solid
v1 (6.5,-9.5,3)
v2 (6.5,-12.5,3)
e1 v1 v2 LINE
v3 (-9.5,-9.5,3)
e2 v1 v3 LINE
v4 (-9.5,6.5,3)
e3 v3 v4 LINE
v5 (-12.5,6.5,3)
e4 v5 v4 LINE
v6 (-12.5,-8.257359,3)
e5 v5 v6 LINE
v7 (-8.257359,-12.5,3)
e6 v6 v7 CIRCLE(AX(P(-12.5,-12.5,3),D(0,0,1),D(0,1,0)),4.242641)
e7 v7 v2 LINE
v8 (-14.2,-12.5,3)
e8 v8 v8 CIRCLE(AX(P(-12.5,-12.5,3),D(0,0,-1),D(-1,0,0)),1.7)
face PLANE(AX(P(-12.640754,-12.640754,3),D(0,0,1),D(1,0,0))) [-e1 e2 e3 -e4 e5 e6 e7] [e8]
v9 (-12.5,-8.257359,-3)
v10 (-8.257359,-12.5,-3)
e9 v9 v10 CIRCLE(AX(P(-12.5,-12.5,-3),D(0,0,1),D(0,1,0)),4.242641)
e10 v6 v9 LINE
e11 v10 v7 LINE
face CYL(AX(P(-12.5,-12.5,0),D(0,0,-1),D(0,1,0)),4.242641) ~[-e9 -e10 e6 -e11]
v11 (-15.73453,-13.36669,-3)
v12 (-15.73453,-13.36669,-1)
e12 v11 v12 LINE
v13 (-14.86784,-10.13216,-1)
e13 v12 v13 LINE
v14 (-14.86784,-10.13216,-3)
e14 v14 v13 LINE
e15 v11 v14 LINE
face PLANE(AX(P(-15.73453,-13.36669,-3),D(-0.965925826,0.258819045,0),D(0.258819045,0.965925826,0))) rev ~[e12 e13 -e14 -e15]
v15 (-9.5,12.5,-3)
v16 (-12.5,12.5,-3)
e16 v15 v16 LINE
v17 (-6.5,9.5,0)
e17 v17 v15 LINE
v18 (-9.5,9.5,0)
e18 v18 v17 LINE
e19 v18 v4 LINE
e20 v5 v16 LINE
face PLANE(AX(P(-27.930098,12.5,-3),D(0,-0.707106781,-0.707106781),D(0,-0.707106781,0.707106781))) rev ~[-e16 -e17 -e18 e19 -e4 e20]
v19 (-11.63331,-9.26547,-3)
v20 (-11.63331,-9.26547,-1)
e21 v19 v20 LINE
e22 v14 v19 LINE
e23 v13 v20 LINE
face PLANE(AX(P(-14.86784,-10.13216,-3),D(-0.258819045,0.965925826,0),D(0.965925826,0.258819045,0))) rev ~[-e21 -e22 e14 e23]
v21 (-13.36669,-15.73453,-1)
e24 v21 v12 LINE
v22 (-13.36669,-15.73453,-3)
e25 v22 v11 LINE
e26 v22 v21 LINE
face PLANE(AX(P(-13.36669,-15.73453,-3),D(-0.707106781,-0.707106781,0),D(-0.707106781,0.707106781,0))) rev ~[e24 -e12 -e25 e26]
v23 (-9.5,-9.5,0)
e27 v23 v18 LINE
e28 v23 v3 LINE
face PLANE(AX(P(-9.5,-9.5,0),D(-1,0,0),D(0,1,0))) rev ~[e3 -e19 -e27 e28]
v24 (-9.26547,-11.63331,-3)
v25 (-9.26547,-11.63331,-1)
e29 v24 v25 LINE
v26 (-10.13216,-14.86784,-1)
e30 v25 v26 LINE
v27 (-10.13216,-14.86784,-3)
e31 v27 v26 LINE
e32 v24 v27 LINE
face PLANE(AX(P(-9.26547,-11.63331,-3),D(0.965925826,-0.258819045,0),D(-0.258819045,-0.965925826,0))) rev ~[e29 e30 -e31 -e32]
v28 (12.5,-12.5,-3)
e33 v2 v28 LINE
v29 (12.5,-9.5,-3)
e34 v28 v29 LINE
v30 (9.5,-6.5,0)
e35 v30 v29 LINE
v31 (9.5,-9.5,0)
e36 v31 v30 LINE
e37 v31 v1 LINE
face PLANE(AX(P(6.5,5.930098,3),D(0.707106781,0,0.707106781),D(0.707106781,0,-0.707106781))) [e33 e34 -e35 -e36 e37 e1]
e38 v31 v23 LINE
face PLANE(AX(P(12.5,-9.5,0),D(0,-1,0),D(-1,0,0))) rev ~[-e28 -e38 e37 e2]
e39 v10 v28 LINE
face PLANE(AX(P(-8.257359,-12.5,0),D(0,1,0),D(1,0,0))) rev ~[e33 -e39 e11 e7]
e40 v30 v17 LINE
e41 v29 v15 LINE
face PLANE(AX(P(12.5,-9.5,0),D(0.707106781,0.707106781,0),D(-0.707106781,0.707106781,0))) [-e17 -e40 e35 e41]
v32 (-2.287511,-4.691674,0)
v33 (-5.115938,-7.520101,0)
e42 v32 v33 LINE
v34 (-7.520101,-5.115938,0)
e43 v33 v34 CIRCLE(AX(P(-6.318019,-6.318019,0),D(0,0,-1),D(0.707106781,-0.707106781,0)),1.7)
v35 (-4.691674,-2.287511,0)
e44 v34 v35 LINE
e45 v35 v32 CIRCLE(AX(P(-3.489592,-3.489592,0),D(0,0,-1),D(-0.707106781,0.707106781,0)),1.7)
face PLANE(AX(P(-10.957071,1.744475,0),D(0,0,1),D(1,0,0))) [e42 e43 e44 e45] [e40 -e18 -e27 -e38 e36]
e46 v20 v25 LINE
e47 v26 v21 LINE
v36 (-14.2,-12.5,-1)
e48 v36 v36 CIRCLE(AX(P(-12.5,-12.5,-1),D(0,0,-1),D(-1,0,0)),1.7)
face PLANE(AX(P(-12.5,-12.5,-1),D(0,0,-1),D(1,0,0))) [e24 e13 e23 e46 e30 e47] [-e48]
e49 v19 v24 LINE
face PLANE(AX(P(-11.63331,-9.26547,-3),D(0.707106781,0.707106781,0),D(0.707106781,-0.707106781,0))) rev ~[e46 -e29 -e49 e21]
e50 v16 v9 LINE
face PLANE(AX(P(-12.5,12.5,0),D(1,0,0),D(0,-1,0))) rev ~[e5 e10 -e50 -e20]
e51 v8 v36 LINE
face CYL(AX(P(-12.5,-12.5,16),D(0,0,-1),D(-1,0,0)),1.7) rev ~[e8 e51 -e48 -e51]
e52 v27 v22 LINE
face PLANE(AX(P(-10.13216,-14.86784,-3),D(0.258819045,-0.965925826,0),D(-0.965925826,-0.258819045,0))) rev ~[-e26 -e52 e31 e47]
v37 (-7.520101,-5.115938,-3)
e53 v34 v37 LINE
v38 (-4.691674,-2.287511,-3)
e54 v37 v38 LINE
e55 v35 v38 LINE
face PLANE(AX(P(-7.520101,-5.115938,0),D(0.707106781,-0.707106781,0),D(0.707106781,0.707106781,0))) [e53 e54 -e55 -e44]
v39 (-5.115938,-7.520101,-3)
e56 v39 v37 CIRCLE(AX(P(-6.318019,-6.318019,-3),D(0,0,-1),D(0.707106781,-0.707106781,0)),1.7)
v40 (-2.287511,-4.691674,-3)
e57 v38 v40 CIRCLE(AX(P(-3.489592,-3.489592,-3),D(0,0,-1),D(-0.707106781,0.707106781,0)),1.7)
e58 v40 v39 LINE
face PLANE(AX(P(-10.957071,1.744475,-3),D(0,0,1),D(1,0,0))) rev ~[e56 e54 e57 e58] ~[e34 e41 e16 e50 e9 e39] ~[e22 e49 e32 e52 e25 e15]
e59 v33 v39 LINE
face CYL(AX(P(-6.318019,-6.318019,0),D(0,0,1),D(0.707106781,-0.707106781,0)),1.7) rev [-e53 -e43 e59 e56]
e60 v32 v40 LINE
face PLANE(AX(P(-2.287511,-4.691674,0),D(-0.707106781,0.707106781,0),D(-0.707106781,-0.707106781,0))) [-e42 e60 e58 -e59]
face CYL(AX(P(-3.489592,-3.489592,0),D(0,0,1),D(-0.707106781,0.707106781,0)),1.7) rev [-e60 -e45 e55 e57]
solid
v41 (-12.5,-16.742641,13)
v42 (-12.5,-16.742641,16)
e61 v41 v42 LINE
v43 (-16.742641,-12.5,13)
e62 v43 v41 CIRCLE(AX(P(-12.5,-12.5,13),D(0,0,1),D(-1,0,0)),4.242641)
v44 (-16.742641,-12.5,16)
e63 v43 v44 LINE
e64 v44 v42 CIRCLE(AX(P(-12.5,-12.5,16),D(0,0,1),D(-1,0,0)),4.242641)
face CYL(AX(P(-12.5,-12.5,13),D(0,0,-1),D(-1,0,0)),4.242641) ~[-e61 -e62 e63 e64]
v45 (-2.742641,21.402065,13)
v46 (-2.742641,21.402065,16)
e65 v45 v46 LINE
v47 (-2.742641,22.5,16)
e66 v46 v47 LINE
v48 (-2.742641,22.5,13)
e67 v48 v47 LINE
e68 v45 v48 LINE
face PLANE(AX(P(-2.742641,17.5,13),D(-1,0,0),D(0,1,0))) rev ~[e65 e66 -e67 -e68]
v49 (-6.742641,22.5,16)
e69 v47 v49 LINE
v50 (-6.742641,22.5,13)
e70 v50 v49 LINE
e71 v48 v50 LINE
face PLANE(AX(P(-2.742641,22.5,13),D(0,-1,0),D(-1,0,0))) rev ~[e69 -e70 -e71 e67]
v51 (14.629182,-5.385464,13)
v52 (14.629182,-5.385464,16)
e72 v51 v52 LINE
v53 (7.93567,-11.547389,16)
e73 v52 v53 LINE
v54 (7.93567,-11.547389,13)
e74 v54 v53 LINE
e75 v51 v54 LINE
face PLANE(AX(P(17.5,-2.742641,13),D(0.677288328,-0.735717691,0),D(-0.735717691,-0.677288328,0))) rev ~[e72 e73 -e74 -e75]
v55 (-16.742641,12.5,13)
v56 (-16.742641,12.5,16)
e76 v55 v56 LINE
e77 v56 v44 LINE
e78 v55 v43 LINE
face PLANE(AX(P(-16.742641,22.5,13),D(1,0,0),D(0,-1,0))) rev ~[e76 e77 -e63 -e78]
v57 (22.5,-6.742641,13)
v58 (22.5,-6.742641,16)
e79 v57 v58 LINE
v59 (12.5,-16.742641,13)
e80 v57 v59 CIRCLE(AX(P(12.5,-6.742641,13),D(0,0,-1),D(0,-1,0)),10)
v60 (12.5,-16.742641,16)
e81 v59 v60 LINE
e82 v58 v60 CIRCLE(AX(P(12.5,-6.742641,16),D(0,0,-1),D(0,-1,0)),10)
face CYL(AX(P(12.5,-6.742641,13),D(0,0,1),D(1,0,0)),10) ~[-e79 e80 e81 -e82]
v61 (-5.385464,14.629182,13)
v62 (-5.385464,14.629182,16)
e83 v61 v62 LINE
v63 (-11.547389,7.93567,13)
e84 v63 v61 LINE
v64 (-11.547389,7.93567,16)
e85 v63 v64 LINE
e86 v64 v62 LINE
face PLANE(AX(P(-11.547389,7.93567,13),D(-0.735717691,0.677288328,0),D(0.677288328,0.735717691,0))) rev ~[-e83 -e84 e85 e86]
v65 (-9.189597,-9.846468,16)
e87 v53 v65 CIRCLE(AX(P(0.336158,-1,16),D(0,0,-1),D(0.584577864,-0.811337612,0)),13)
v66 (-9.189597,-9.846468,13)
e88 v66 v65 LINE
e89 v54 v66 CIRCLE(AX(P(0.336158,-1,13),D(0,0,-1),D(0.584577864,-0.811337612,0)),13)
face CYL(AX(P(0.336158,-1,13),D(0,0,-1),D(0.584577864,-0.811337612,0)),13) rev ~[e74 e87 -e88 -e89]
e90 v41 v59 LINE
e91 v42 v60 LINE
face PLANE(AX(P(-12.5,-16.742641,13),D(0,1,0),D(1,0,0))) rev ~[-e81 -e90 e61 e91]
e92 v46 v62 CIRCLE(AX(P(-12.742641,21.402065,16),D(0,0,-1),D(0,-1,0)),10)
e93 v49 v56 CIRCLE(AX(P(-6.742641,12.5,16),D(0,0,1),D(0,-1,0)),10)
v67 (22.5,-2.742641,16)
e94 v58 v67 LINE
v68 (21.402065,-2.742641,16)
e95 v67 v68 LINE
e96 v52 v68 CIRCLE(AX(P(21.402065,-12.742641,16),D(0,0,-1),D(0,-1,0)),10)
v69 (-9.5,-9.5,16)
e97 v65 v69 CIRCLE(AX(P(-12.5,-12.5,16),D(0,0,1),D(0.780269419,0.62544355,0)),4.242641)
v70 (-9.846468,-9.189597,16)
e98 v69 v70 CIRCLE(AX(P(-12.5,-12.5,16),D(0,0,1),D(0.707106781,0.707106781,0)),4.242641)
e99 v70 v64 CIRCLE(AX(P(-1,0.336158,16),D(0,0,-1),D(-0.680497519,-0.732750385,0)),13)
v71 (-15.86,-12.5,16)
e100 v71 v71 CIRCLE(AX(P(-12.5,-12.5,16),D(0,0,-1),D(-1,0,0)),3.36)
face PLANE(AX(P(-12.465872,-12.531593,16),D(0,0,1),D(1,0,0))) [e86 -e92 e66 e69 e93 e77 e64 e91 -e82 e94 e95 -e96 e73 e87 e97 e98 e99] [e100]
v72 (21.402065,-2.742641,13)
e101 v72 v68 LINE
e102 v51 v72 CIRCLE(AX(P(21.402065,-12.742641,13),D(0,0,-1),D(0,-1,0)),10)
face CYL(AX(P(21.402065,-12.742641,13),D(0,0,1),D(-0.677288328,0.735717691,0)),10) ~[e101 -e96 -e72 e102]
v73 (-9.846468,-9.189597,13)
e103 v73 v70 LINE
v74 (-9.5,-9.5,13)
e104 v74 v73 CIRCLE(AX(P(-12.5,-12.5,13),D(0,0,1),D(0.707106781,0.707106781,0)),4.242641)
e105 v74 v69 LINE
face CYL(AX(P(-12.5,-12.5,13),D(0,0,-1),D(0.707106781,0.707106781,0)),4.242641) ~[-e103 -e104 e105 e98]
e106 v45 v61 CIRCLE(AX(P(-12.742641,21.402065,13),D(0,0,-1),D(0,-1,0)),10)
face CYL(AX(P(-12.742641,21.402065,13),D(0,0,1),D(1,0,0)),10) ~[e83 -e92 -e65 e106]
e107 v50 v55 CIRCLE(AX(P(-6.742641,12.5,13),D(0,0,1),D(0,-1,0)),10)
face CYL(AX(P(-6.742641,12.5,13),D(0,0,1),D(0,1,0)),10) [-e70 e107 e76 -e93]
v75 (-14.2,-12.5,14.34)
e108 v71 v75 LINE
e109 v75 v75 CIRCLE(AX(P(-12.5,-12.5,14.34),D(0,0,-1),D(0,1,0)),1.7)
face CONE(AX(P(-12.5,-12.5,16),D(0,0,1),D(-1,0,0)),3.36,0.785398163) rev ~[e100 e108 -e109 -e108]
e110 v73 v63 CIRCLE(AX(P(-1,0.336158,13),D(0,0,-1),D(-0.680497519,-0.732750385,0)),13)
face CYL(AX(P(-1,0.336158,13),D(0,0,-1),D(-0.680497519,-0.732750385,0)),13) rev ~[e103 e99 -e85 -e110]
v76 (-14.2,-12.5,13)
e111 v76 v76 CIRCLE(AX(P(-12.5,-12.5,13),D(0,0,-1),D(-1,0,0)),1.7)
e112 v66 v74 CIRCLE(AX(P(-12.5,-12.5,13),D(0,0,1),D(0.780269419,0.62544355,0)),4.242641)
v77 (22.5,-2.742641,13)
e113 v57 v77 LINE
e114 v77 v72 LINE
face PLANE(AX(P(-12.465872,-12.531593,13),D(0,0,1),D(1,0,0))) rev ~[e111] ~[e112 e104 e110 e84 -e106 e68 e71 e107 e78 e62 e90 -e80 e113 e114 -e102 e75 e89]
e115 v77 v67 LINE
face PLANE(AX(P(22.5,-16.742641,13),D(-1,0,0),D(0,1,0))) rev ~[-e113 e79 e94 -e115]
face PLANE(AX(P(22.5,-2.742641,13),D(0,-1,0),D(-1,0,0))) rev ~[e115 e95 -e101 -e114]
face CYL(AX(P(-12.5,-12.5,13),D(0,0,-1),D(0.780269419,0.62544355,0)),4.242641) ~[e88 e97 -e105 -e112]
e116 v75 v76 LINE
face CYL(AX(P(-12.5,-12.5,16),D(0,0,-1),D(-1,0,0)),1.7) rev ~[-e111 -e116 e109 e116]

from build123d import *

# Parameters (mm, degrees)
F1_DEPTH         = 3
F2_DEPTH         = 3
F5_DEPTH         = 3
F7_D             = 3.4
F7_DEPTH         = 50
F7_CSINK_D       = 6.72
F7_CSINK_ANGLE   = 90
F7_TIP           = 1.0214630523
F7_2_D           = 3.4
F7_2_DEPTH       = 50
F7_2_CSINK_D     = 6.72
F7_2_CSINK_ANGLE = 90
F7_2_TIP         = 1.0214630523
F9_DEPTH         = 2
F10_R            = 10
F11_T1_DEPTH     = 33.8601958556
F11_T3_DEPTH     = 33.8601958556


# Not quite as in the source:
# - a fillet or chamfer that OpenCascade refuses, or shapes differently, is made with other operations: its cross-section is extruded or revolved along the edge and cut away or added
# - a feature names something its author has since deleted; it is built from what else it names


with BuildPart() as f1:
    # F0 (on Top) → F1 (new body)
    with BuildSketch(Plane.XY):
        with BuildLine():
            ThreePointArc((-12.5, -8.2573593129), (-10.8764116996, -8.5803111054), (-9.5, -9.5))
            Line((-9.5, -9.5), (-9.5, 12.5))
            Line((-9.5, 12.5), (-12.5, 12.5))
            Line((-12.5, 12.5), (-12.5, -8.2573593129))
        make_face()
        with BuildLine():
            Line((-8.2573593129, -12.5), (12.5, -12.5))
            Line((12.5, -12.5), (12.5, -9.5))
            Line((12.5, -9.5), (-9.5, -9.5))
            ThreePointArc((-9.5, -9.5), (-8.5803111054, -10.8764116996), (-8.2573593129, -12.5))
        make_face()
        with BuildLine():
            Line((-12.5, -12.5), (-8.2573593129, -12.5))
            ThreePointArc((-8.2573593129, -12.5), (-8.5803111054, -10.8764116996), (-9.5, -9.5))
            ThreePointArc((-9.5, -9.5), (-10.8764116996, -8.5803111054), (-12.5, -8.2573593129))
            Line((-12.5, -8.2573593129), (-12.5, -12.5))
        make_face()
        with BuildLine():
            ThreePointArc((-12.5, -8.2573593129), (-15.5, -15.5), (-8.2573593129, -12.5))
            Line((-8.2573593129, -12.5), (-12.5, -12.5))
            Line((-12.5, -12.5), (-12.5, -8.2573593129))
        make_face()
        Polygon((-9.5, -9.5), (12.5, -9.5), (-9.5, 12.5), align=None)
        with BuildLine():
            Line((-2.2875108319, -4.6916738879), (-5.1159379566, -7.5201010127))
            ThreePointArc((-5.1159379566, -7.5201010127), (-7.5201010127, -7.5201010127), (-7.5201010127, -5.1159379566))
            Line((-7.5201010127, -5.1159379566), (-4.6916738879, -2.2875108319))
            ThreePointArc((-4.6916738879, -2.2875108319), (-2.2875108319, -2.2875108319), (-2.2875108319, -4.6916738879))
        make_face(mode=Mode.SUBTRACT)
    extrude(amount=-F1_DEPTH)

    # F0 (on Top) → F2 (join)
    with BuildSketch(Plane.XY):
        with BuildLine():
            ThreePointArc((-12.5, -8.2573593129), (-15.5, -15.5), (-8.2573593129, -12.5))
            Line((-8.2573593129, -12.5), (-12.5, -12.5))
            Line((-12.5, -12.5), (-12.5, -8.2573593129))
        make_face()
        with BuildLine():
            Line((-12.5, -12.5), (-8.2573593129, -12.5))
            ThreePointArc((-8.2573593129, -12.5), (-8.5803111054, -10.8764116996), (-9.5, -9.5))
            ThreePointArc((-9.5, -9.5), (-10.8764116996, -8.5803111054), (-12.5, -8.2573593129))
            Line((-12.5, -8.2573593129), (-12.5, -12.5))
        make_face()
        with BuildLine():
            ThreePointArc((-12.5, -8.2573593129), (-10.8764116996, -8.5803111054), (-9.5, -9.5))
            Line((-9.5, -9.5), (-9.5, 12.5))
            Line((-9.5, 12.5), (-12.5, 12.5))
            Line((-12.5, 12.5), (-12.5, -8.2573593129))
        make_face()
        with BuildLine():
            Line((-8.2573593129, -12.5), (12.5, -12.5))
            Line((12.5, -12.5), (12.5, -9.5))
            Line((12.5, -9.5), (-9.5, -9.5))
            ThreePointArc((-9.5, -9.5), (-8.5803111054, -10.8764116996), (-8.2573593129, -12.5))
        make_face()
    extrude(amount=F2_DEPTH)

    # F7
    with Locations(Plane.XY.offset(16)):
        with Locations((-12.5, -12.5)):
            CounterSinkHole(F7_D / 2, F7_CSINK_D / 2, depth=F7_DEPTH, counter_sink_angle=F7_CSINK_ANGLE)
            with Locations((0, 0, -(F7_DEPTH + F7_TIP / 2))):  # 118° drill point
                Cone(0, F7_D / 2, F7_TIP, mode=Mode.SUBTRACT)

    # F8 (on face) → F9 (cut)
    with BuildSketch(Plane(origin=(0, 0, -3), x_dir=(1, 0, 0), z_dir=(0, 0, -1))):
        Polygon((-13.3666896231, 15.7345297078), (-15.7345297078, 13.3666896231), (-14.8678400847, 10.1321599153), (-11.6333103769, 9.2654702922), (-9.2654702922, 11.6333103769), (-10.1321599153, 14.8678400847), align=None)
    extrude(amount=-F9_DEPTH, mode=Mode.SUBTRACT)

    # F11: chamfer of 6 on 2 edges, made by hand

    # F11_s2 → F11_t1 (cut)
    with BuildSketch(Plane.XZ.offset(-5.9300979278)):
        Polygon((6.5, 3), (12.5, -3), (12.5, 3), align=None)
    extrude(amount=F11_T1_DEPTH, mode=Mode.SUBTRACT)

    # F11_s4 → F11_t3 (cut)
    with BuildSketch(Plane.YZ.offset(-27.9300979278)):
        Polygon((12.5, -3), (6.5, 3), (12.5, 3), align=None)
    extrude(amount=F11_T3_DEPTH, mode=Mode.SUBTRACT)


with BuildPart() as f5:
    # F4 (on offset) → F5 (new body)
    with BuildSketch(Plane.XY.offset(13)):
        with BuildLine():
            ThreePointArc((-9.8464677493, -9.1895972156), (-14.3360305156, -8.6752134771), (-16.7426406871, -12.5))
            ThreePointArc((-16.7426406871, -12.5), (-15.5, -15.5), (-12.5, -16.7426406871))
            ThreePointArc((-12.5, -16.7426406871), (-9.5, -15.5), (-8.2573593129, -12.5))
            ThreePointArc((-8.2573593129, -12.5), (-8.497197885, -11.0937371412), (-9.1895972156, -9.8464677493))
            ThreePointArc((-9.1895972156, -9.8464677493), (-9.3463484327, -9.6746223732), (-9.5, -9.5))
            ThreePointArc((-9.5, -9.5), (-9.6746223732, -9.3463484327), (-9.8464677493, -9.1895972156))
        make_face()
        with BuildLine():
            Line((-16.7426406871, 22.5), (-16.7426406871, -12.5))
            ThreePointArc((-16.7426406871, -12.5), (-14.3360305156, -8.6752134771), (-9.8464677493, -9.1895972156))
            ThreePointArc((-9.8464677493, -9.1895972156), (-13.936348556, -0.9487103143), (-11.5473889556, 7.935670022))
            Line((-11.5473889556, 7.935670022), (-2.7426406871, 17.5))
            Line((-2.7426406871, 17.5), (-2.7426406871, 22.5))
            Line((-2.7426406871, 22.5), (-16.7426406871, 22.5))
        make_face()
        with BuildLine():
            ThreePointArc((-8.2573593129, -12.5), (-9.5, -15.5), (-12.5, -16.7426406871))
            Line((-12.5, -16.7426406871), (22.5, -16.7426406871))
            Line((22.5, -16.7426406871), (22.5, -2.7426406871))
            Line((22.5, -2.7426406871), (17.5, -2.7426406871))
            Line((17.5, -2.7426406871), (7.935670022, -11.5473889556))
            ThreePointArc((7.935670022, -11.5473889556), (-0.9487103143, -13.936348556), (-9.1895972156, -9.8464677493))
            ThreePointArc((-9.1895972156, -9.8464677493), (-8.497197885, -11.0937371412), (-8.2573593129, -12.5))
        make_face()
        with BuildLine():
            ThreePointArc((-9.5, -9.5), (-9.6689764749, -9.3400465509), (-9.8464677493, -9.1895972156))
            ThreePointArc((-9.8464677493, -9.1895972156), (-9.6746223732, -9.3463484327), (-9.5, -9.5))
        make_face()
        with BuildLine():
            ThreePointArc((-9.1895972156, -9.8464677493), (-9.3400465509, -9.6689764749), (-9.5, -9.5))
            ThreePointArc((-9.5, -9.5), (-9.3463484327, -9.6746223732), (-9.1895972156, -9.8464677493))
        make_face()
    extrude(amount=F5_DEPTH)

    # F7#2
    with Locations(Plane.XY.offset(16)):
        with Locations((-12.5, -12.5)):
            CounterSinkHole(F7_2_D / 2, F7_2_CSINK_D / 2, depth=F7_2_DEPTH, counter_sink_angle=F7_2_CSINK_ANGLE)
            with Locations((0, 0, -(F7_2_DEPTH + F7_2_TIP / 2))):  # 118° drill point
                Cone(0, F7_2_D / 2, F7_2_TIP, mode=Mode.SUBTRACT)

    # F10
    f10_edges = [f5.edges().sort_by_distance(p)[0] for p in [
        (-16.742641, 22.5, 14.5),
        (22.5, -16.742641, 14.5),
        (-2.742641, 17.5, 14.5),
        (17.5, -2.742641, 14.5),
    ]]
    fillet(f10_edges, radius=F10_R)


solid = Compound([f1.part, f5.part])
